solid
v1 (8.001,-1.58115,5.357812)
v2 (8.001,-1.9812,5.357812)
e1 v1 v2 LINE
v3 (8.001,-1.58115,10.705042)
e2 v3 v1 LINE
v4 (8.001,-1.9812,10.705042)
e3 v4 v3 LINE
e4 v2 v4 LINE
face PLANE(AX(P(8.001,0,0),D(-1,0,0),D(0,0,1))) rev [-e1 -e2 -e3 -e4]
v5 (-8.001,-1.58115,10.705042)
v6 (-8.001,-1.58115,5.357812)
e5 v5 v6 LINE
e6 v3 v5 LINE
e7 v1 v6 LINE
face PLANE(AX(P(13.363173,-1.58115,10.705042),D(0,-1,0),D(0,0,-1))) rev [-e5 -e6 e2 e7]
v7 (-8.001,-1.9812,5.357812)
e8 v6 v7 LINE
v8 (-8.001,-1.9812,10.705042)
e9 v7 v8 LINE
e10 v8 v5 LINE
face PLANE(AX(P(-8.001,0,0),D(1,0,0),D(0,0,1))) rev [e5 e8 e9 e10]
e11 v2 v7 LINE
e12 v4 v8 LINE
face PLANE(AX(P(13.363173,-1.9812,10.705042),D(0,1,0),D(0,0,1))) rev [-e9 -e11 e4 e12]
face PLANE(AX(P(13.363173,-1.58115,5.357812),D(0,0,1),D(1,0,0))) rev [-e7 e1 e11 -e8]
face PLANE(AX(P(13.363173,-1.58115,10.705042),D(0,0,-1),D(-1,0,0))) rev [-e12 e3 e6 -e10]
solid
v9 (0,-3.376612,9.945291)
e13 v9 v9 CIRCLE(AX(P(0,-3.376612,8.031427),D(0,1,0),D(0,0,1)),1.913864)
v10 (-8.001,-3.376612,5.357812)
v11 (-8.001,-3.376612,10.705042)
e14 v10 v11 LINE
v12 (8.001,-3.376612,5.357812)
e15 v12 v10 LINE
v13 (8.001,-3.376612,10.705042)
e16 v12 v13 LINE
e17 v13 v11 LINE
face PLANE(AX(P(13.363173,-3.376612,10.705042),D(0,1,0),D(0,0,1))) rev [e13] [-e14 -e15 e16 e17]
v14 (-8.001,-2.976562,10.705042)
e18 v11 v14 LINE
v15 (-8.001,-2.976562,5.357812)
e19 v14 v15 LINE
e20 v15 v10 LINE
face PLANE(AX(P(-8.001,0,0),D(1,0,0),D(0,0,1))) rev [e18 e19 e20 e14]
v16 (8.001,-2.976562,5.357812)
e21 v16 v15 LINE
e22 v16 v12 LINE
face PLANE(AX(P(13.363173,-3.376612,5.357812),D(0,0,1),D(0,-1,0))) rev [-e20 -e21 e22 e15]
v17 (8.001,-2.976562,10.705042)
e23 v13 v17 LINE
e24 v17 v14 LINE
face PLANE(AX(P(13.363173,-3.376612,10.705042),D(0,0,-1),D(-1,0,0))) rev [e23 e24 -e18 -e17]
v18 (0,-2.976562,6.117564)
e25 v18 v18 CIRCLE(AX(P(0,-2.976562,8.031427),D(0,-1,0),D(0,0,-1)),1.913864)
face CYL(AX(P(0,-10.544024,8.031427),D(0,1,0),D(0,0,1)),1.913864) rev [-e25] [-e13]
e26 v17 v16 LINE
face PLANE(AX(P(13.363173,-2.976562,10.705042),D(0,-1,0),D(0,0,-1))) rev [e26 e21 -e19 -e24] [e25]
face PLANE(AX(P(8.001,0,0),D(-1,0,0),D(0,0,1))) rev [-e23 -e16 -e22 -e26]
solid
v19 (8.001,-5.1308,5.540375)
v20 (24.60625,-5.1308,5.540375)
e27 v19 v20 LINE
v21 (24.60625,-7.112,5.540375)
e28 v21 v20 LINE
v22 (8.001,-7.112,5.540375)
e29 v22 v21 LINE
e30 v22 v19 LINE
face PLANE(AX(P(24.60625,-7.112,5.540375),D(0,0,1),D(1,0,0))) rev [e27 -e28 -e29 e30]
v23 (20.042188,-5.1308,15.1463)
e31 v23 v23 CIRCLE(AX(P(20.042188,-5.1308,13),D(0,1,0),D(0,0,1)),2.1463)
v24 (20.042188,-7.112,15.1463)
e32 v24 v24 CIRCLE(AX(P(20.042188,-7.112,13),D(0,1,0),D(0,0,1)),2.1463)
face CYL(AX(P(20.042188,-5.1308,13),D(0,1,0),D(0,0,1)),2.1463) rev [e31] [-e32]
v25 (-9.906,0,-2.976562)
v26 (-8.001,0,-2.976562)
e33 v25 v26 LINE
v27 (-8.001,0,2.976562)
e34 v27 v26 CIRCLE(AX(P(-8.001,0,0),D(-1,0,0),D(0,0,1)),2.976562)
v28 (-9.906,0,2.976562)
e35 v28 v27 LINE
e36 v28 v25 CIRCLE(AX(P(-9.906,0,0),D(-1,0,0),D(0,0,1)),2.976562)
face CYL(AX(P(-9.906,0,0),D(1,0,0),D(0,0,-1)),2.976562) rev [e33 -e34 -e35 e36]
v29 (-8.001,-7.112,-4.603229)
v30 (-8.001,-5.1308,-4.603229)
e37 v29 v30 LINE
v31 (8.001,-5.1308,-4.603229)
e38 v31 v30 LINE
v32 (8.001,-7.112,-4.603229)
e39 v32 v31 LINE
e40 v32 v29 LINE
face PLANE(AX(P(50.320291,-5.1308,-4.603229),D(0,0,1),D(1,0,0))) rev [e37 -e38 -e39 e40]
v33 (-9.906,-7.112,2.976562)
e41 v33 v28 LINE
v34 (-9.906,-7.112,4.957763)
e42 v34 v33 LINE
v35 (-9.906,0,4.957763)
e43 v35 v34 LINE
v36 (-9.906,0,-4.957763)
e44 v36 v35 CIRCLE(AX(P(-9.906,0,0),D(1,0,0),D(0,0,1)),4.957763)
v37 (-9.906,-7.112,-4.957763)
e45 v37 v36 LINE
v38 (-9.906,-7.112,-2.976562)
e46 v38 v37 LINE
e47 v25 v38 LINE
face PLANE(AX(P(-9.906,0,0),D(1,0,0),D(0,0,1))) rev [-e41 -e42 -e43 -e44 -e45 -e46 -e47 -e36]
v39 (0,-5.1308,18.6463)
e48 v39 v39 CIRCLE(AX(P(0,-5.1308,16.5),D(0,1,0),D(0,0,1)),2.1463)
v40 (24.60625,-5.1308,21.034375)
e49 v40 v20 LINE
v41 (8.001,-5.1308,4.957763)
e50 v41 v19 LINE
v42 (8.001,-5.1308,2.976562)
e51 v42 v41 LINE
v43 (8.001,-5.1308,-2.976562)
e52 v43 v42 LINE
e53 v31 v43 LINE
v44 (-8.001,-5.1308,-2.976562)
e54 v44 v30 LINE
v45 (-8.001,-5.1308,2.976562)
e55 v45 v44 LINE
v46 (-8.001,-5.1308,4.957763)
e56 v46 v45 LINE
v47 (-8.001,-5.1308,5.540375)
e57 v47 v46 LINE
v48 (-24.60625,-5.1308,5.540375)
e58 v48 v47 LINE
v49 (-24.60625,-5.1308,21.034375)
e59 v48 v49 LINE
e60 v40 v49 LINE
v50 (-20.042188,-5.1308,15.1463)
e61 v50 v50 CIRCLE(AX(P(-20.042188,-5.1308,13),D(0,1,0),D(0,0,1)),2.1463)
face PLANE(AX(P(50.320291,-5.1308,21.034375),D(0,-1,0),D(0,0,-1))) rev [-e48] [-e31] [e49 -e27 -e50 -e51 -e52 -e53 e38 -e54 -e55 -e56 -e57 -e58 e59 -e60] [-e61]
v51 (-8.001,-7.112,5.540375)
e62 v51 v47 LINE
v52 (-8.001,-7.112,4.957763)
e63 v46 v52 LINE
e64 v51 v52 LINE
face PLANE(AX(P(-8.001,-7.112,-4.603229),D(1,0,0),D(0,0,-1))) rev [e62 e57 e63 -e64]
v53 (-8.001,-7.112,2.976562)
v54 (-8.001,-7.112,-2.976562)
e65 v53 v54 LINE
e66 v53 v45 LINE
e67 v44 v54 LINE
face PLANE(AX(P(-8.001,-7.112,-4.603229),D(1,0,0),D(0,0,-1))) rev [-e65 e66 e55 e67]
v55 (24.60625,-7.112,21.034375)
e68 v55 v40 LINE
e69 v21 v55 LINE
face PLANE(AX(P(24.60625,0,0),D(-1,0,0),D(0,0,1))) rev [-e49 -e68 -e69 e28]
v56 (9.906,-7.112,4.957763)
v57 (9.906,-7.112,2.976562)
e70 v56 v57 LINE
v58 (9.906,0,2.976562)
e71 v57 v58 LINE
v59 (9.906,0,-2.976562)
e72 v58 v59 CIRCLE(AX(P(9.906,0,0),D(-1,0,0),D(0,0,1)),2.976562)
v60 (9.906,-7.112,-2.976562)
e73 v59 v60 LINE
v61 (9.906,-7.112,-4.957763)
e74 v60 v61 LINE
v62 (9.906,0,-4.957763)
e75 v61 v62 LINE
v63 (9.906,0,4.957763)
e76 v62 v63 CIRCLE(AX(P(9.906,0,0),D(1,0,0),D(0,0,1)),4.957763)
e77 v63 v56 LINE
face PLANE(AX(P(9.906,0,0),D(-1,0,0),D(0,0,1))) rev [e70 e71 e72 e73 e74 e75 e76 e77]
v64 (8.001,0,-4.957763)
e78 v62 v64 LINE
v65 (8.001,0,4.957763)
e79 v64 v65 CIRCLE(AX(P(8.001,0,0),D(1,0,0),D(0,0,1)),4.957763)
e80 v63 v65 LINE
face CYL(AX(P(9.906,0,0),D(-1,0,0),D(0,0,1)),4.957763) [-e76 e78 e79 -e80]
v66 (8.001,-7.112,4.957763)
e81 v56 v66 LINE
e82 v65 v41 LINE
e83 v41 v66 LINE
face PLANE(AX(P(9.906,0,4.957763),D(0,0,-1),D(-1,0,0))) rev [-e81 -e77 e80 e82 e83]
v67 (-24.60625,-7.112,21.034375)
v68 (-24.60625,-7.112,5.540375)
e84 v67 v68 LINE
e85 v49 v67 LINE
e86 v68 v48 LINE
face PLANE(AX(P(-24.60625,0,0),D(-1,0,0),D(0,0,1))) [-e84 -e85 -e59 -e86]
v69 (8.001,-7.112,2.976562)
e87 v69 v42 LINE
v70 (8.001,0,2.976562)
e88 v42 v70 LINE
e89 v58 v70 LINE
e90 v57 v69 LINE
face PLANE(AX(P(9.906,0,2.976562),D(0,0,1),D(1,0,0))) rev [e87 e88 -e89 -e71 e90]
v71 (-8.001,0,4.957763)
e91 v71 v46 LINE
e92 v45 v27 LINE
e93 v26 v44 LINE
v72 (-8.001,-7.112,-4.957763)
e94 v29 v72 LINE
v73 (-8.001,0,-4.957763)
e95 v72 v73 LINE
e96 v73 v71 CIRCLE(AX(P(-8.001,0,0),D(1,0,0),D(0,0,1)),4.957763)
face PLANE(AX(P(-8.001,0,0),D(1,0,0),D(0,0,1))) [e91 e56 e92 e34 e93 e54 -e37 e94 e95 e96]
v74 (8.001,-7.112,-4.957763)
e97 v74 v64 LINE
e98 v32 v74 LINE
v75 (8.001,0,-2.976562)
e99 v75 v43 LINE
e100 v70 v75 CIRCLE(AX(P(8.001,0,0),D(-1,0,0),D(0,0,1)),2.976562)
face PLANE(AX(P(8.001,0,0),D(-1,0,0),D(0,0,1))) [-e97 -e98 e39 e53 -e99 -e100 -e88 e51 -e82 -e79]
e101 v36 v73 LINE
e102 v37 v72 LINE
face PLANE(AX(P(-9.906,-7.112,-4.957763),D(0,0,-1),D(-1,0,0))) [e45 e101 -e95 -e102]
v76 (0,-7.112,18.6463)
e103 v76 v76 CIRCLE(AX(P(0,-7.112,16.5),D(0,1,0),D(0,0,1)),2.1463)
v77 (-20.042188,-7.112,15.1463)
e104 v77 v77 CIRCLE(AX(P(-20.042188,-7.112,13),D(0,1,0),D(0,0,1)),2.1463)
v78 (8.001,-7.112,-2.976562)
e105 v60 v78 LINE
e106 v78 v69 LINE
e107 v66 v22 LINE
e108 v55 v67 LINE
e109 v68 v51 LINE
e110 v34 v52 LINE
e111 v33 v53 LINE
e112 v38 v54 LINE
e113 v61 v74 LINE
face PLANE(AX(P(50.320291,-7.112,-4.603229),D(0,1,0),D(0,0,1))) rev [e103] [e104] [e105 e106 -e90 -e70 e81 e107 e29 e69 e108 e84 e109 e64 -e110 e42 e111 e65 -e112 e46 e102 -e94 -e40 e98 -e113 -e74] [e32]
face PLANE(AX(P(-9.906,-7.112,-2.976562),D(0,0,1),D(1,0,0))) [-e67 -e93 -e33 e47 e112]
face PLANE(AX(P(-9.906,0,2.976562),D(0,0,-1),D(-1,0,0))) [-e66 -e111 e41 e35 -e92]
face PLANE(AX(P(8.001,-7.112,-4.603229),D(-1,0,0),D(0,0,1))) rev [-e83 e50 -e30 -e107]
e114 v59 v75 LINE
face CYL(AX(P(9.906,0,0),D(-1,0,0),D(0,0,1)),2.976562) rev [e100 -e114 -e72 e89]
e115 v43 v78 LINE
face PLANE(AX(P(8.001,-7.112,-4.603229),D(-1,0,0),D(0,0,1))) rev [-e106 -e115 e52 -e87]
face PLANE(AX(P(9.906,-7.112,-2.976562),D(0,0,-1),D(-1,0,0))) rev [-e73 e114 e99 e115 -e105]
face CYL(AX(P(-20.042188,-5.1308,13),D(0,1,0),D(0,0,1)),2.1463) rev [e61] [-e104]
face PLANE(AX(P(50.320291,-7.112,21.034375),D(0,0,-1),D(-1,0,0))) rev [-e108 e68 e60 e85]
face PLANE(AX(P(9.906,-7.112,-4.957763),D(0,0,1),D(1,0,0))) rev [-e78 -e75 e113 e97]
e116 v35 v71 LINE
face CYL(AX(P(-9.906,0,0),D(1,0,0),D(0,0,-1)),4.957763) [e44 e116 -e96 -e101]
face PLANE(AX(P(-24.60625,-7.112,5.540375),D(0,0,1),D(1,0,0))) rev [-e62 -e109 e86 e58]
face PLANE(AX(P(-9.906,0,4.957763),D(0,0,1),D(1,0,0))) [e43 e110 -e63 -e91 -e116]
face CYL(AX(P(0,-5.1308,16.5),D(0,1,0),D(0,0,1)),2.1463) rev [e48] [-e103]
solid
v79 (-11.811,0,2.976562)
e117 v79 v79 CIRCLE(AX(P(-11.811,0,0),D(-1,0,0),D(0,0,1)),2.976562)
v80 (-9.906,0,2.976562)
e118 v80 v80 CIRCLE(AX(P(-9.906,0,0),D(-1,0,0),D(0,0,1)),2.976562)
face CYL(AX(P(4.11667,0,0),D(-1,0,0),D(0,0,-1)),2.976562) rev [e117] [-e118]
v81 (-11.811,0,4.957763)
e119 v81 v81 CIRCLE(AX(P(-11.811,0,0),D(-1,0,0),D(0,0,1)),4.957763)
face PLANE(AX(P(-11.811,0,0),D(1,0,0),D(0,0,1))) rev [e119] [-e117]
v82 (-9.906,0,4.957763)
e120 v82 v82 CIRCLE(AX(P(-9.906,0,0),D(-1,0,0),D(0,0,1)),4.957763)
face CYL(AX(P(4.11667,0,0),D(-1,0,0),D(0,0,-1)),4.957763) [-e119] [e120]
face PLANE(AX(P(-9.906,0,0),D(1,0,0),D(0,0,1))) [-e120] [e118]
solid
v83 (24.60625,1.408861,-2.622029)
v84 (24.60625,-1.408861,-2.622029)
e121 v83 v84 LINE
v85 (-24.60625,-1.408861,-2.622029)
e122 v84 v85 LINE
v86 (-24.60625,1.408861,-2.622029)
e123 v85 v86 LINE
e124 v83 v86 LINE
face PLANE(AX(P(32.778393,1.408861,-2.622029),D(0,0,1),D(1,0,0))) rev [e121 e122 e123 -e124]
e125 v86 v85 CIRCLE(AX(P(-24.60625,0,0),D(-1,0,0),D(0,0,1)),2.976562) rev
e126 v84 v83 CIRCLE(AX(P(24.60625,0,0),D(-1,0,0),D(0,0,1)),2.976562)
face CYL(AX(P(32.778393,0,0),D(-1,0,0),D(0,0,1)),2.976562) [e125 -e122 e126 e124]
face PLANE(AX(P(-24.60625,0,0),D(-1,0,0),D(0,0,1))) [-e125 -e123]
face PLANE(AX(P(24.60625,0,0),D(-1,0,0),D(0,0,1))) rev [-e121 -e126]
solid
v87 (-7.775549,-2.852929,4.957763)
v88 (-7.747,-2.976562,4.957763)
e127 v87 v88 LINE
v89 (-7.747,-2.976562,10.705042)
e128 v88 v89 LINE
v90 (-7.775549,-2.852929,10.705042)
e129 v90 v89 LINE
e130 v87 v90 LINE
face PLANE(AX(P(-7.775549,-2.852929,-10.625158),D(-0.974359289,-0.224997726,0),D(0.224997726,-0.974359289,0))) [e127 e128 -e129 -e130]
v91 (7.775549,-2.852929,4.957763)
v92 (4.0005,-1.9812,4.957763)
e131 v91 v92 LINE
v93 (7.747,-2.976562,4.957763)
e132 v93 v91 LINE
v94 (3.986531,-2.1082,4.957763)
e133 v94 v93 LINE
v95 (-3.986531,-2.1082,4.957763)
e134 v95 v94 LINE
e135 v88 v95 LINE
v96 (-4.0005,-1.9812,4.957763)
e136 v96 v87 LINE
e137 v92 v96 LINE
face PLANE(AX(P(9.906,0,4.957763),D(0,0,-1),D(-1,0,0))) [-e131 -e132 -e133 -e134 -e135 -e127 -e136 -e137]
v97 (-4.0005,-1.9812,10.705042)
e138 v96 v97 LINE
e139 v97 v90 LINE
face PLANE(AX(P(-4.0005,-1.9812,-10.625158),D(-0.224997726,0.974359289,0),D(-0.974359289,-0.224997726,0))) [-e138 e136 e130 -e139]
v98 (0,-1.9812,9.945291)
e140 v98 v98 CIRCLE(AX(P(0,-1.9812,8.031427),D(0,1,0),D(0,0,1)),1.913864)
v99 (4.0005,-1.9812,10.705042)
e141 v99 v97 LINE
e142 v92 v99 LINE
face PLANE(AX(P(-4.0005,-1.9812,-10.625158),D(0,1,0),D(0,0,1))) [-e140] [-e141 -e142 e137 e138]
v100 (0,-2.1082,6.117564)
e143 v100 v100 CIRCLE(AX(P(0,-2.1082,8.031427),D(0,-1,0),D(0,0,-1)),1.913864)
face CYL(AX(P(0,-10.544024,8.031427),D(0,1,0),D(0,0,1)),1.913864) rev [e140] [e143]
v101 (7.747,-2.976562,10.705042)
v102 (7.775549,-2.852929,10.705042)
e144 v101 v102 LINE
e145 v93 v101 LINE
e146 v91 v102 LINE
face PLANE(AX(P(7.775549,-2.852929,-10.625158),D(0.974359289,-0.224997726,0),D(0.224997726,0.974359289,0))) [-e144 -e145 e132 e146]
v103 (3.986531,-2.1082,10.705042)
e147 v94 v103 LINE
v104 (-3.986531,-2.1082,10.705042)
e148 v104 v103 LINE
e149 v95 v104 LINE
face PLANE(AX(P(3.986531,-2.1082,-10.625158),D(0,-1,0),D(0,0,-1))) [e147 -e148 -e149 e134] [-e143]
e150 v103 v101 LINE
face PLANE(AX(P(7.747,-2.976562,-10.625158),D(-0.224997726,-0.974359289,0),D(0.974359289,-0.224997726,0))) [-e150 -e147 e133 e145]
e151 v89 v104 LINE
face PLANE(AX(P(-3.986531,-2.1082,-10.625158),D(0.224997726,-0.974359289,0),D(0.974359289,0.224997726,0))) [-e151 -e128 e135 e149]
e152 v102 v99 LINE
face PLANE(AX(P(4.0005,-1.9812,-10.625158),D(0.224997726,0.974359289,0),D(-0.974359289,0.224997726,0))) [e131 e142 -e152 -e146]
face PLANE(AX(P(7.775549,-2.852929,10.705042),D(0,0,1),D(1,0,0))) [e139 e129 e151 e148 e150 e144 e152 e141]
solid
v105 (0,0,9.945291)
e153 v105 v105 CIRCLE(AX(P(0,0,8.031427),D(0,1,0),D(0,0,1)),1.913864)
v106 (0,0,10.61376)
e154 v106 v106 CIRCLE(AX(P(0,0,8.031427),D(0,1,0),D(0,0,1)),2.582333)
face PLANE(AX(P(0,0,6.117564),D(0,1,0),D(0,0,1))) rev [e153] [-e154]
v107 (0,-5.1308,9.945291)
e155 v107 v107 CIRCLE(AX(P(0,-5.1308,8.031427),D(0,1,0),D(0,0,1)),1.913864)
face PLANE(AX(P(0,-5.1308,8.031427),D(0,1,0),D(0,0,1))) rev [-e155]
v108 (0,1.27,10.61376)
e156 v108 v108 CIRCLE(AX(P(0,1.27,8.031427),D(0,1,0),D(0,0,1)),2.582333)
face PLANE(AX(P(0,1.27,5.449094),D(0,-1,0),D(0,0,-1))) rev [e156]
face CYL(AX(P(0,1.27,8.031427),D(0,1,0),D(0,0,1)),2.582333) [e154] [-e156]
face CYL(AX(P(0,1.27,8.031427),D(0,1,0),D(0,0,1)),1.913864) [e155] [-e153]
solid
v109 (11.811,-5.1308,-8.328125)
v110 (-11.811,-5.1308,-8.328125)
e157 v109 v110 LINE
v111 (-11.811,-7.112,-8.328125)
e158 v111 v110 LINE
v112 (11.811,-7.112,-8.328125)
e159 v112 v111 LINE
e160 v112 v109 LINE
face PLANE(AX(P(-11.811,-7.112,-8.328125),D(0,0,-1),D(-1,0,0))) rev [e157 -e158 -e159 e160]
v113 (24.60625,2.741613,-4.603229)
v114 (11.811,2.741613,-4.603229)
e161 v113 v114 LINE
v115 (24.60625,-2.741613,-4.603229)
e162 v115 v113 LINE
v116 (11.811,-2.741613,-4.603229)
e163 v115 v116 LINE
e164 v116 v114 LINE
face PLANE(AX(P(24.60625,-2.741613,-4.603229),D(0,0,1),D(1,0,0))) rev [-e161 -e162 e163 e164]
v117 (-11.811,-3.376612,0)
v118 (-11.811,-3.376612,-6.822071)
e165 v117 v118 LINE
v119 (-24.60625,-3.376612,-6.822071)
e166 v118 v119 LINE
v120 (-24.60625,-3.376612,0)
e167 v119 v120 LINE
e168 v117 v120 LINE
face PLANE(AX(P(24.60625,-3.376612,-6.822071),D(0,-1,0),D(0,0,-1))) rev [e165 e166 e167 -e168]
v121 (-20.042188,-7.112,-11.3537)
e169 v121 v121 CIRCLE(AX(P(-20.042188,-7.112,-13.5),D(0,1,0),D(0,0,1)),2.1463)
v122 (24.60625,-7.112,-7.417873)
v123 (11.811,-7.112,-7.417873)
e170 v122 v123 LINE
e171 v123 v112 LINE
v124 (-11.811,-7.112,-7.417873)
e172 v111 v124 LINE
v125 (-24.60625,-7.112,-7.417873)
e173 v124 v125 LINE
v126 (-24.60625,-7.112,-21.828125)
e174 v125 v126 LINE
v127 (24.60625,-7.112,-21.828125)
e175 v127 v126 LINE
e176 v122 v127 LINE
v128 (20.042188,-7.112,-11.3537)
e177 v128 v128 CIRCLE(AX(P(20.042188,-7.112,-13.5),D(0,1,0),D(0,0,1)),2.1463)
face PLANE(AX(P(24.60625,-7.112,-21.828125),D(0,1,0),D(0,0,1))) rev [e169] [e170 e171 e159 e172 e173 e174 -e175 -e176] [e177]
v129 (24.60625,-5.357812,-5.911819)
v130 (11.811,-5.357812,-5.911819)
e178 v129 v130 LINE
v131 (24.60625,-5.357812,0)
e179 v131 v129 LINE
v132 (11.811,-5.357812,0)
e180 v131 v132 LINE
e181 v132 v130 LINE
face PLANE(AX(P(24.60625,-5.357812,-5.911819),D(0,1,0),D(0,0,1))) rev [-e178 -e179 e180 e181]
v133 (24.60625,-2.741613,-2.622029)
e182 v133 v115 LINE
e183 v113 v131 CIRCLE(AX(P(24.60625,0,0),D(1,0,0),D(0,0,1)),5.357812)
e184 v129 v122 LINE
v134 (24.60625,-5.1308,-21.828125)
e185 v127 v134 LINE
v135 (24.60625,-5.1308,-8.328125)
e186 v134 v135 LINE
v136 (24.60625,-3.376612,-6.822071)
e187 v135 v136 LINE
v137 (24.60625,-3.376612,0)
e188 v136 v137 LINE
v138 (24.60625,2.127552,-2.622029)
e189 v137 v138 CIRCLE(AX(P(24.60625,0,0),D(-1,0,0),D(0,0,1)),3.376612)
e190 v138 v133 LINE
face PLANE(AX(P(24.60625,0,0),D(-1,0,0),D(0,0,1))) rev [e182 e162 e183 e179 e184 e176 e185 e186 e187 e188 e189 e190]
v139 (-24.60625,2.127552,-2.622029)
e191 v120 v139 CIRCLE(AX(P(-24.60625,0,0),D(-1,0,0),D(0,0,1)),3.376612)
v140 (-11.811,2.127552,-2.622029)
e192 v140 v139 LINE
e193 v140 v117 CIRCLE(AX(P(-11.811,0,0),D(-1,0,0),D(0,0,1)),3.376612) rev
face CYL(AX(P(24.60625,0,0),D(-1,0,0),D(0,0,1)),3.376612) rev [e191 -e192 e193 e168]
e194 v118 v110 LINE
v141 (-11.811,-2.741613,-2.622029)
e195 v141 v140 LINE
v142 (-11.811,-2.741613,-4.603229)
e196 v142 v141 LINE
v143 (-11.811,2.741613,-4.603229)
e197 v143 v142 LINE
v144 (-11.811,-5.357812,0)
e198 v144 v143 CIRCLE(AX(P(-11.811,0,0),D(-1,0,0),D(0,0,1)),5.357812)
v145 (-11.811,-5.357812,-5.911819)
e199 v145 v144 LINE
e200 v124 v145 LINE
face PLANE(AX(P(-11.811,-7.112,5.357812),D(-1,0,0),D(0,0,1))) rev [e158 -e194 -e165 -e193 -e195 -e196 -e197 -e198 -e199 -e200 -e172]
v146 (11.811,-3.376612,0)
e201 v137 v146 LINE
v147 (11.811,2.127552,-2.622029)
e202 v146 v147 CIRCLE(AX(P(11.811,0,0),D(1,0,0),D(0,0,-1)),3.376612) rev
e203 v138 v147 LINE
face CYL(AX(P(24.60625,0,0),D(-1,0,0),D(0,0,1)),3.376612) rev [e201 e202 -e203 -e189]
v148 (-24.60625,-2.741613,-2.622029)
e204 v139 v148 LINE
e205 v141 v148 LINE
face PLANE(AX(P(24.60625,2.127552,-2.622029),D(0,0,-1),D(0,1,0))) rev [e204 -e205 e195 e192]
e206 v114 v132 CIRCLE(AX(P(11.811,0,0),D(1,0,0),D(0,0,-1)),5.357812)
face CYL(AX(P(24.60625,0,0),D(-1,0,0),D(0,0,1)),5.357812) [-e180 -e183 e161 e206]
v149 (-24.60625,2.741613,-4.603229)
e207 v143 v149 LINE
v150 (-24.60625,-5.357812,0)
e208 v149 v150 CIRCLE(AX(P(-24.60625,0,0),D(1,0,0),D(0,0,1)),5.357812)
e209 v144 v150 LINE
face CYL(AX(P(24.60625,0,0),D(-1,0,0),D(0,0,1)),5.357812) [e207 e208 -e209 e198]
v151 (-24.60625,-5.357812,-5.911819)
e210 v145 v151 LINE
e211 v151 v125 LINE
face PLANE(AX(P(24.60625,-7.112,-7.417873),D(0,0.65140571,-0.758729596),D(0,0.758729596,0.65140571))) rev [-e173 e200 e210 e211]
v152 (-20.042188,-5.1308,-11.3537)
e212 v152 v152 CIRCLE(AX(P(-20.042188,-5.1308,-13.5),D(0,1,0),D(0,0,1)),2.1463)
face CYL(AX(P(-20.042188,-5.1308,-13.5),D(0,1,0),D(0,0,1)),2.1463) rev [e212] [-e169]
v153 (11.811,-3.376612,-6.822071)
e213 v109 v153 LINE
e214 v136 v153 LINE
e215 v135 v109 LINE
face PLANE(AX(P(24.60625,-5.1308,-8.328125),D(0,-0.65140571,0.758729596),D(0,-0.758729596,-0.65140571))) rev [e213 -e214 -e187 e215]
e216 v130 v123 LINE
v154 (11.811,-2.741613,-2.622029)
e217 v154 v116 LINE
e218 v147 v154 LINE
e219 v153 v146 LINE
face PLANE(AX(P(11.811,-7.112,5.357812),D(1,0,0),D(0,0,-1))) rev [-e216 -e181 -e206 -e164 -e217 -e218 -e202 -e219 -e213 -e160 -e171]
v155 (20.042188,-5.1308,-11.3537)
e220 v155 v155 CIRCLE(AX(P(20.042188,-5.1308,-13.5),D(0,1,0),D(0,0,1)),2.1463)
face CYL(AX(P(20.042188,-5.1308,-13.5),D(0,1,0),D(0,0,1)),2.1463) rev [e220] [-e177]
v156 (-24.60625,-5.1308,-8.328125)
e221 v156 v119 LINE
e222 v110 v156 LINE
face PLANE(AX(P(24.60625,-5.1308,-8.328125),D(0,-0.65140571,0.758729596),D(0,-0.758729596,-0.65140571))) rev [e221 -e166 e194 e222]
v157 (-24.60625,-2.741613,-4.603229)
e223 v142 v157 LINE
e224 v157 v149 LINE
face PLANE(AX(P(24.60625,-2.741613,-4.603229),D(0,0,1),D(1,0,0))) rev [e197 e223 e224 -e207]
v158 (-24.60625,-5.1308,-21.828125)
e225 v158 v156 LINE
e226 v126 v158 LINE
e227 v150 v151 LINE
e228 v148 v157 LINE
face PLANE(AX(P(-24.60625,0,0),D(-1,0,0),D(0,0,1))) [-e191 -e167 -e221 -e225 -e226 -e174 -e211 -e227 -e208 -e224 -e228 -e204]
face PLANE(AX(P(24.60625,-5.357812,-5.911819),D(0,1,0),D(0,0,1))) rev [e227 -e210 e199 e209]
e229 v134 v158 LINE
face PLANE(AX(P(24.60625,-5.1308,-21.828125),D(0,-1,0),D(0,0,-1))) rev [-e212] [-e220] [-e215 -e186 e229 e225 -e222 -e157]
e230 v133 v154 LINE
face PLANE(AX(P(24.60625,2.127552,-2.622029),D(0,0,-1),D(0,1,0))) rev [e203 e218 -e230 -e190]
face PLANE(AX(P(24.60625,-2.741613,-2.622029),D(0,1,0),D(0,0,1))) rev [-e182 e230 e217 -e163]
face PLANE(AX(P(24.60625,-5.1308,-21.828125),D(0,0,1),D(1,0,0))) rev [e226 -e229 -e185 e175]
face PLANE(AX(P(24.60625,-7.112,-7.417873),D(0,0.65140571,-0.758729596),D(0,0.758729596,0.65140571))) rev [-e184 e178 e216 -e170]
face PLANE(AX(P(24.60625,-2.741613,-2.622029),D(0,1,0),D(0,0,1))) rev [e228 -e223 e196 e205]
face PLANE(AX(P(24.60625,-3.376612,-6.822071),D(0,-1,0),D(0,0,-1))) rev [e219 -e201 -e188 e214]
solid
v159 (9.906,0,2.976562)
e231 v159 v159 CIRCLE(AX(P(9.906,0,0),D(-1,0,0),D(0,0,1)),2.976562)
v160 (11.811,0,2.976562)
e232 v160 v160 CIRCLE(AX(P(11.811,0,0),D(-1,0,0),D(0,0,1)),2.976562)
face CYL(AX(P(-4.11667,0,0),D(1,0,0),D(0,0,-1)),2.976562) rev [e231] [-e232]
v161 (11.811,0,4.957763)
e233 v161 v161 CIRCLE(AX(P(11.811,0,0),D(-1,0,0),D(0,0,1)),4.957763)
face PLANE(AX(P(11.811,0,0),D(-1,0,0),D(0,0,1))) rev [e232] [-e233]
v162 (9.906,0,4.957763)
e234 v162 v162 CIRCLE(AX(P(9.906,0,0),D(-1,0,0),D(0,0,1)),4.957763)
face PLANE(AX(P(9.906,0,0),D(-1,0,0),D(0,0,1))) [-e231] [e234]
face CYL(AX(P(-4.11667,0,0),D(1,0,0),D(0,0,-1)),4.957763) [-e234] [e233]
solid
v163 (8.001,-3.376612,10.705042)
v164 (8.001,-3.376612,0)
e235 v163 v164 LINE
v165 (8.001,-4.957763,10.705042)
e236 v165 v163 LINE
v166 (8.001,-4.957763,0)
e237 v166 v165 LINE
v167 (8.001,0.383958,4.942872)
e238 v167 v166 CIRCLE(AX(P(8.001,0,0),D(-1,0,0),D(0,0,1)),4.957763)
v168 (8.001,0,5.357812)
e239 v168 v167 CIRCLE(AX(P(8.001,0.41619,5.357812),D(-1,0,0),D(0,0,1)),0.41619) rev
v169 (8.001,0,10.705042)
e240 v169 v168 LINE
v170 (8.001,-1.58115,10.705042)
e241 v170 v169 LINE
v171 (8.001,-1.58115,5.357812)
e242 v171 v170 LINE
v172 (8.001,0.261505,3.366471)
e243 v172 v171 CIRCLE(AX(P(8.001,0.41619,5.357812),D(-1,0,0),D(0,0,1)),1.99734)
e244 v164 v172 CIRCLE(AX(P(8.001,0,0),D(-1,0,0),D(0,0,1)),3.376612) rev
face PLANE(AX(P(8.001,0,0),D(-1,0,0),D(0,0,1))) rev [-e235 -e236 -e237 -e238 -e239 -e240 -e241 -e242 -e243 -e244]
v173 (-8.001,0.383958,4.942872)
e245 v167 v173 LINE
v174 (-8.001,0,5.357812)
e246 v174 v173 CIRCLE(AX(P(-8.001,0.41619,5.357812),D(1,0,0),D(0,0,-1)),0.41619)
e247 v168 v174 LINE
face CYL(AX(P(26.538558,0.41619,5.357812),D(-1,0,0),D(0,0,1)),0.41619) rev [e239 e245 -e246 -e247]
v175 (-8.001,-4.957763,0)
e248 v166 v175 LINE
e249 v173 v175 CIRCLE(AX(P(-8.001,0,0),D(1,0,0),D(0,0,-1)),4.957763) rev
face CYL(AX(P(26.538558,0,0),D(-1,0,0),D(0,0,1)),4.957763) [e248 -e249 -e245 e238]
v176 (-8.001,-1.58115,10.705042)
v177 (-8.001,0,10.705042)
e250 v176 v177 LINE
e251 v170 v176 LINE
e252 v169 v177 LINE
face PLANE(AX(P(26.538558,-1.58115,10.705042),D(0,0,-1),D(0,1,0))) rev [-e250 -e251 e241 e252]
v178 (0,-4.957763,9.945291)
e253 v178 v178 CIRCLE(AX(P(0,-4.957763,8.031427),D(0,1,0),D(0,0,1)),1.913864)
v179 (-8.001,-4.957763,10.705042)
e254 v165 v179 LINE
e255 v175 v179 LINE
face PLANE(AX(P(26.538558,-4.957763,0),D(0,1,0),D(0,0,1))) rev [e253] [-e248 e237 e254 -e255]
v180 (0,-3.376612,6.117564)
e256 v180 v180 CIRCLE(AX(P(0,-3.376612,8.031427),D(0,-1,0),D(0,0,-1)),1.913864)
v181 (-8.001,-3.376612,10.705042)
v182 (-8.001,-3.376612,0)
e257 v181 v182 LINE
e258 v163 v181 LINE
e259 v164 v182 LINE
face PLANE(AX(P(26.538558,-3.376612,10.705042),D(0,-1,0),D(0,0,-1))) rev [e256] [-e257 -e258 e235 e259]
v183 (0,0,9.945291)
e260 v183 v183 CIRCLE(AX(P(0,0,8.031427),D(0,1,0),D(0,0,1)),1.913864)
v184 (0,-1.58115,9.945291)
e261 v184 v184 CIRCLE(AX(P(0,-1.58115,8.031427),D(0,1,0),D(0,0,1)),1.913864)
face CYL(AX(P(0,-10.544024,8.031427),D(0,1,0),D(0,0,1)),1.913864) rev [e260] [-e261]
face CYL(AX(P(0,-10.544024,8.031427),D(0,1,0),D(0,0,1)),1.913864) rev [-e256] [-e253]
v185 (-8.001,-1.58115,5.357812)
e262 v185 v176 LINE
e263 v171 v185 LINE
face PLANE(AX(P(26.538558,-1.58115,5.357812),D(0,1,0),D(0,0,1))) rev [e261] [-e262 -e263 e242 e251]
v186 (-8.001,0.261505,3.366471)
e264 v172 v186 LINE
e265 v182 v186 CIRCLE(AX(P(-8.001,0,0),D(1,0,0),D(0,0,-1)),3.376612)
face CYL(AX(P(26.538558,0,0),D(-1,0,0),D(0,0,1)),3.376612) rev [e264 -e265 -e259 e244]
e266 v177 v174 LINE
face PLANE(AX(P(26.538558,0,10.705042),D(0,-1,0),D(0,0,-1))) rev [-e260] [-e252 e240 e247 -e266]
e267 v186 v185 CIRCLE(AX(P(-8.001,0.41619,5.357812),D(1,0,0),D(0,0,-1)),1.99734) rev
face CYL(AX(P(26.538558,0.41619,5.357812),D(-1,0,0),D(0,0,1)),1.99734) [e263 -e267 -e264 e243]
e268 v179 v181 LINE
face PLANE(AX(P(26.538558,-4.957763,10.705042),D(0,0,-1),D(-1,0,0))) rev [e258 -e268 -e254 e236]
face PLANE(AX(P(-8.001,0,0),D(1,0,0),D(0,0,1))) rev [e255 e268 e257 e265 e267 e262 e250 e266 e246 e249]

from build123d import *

# Parameters (mm, degrees)
EXTRUDE1_DEPTH                      = 24.60625
CUT_EXTRUDE1_DEPTH                  = 34.652862049
CUT_EXTRUDE1_DEPTH_BACK             = 34.652862049
SKETCH2_W                           = 23.622
SKETCH2_H                           = 13.6859375
EXTRUDE2_START                      = -24.60625
EXTRUDE2_DEPTH                      = 49.2125
SKETCH16_W                          = 16.60525
SKETCH16_H                          = 10.143603833
CUT_EXTRUDE4_DEPTH                  = 35.524564766
EXTRUDE7_DEPTH                      = 1.905
SKETCH18_R                          = 4.9577625
SKETCH18_R_2                        = 2.9765625
EXTRUDE8_DEPTH                      = 1.905
EXTRUDE9_START                      = -8.001
EXTRUDE9_DEPTH                      = 16.002
EXTRUDE10_START                     = -8.001
SKETCH21_W                          = 5.347229167
SKETCH21_H                          = 0.40005
EXTRUDE10_DEPTH                     = 16.002
EXTRUDE12_REACH                     = 35.653
SKETCH24_W                          = 5.347229167
SKETCH24_H                          = 0.40005
EXTRUDE12_DIRECTION_2_REACH         = 35.653
EXTRUDE11_DEPTH                     = 5.747279167
EXTRUDE5_START                      = -24.60625
EXTRUDE5_DEPTH                      = 49.2125
SKETCH11_W                          = 2.1463
SKETCH11_H                          = 1.9812
F_8_0_199_DIAMETER_HOLE3_AT_2_COUNT = 2
F_8_0_199_DIAMETER_HOLE3_AT_2_PITCH = 40.084375
F_8_0_199_DIAMETER_HOLE3_AT_3_COUNT = 2
F_8_0_199_DIAMETER_HOLE3_AT_3_PITCH = 26.5
F_8_0_199_DIAMETER_HOLE3_AT_4_COUNT = 2
F_8_0_199_DIAMETER_HOLE3_AT_4_PITCH = 48.052129184
F_8_0_199_DIAMETER_HOLE3_AT_5_COUNT = 2
F_8_0_199_DIAMETER_HOLE3_AT_5_PITCH = 36.078931245
CUT_EXTRUDE3_START                  = -4.957763
SKETCH14_R                          = 1.913863542
CUT_EXTRUDE3_DEPTH                  = 4.957763


# Read off the part's stored shape, not the designer's step: Extrude9
with BuildPart() as part:
    # Sketch1 → Extrude1 (new, symmetric)
    with BuildSketch(Plane(origin=(0, 0, 0), x_dir=(0, 0, -1), z_dir=(1, 0, 0))):
        with BuildLine():
            Line((21.828125, -5.1308), (8.328125, -5.1308))
            Line((8.328125, -5.1308), (6.822070985, -3.3766125))
            Line((6.822070985, -3.3766125), (0, -3.3766125))
            ThreePointArc((0, -3.3766125), (-3.048395485, 1.452169736), (2.622028833, 2.127551827))
            Line((2.622028833, 2.127551827), (2.622028833, -2.7416125))
            Line((2.622028833, -2.7416125), (4.603228833, -2.7416125))
            Line((4.603228833, -2.7416125), (4.603228833, 2.7416125))
            ThreePointArc((4.603228833, 2.7416125), (-4.658068296, 2.647367472), (0, -5.3578125))
            Line((0, -5.3578125), (5.911819151, -5.3578125))
            Line((5.911819151, -5.3578125), (7.417873166, -7.112))
            Line((7.417873166, -7.112), (21.828125, -7.112))
            Line((21.828125, -7.112), (21.828125, -5.1308))
        make_face()
    extrude(amount=EXTRUDE1_DEPTH, both=True)

    # Sketch2 → Cut-Extrude1 (cut, two sides: drawn at the far end of the back side and taken through both)
    with BuildSketch(Plane(origin=(0, 0, 0), x_dir=(1, 0, 0), z_dir=(0, 1, 0)).offset(-CUT_EXTRUDE1_DEPTH_BACK)):
        with Locations((0, 1.48515625)):
            Rectangle(SKETCH2_W, SKETCH2_H)
    extrude(amount=CUT_EXTRUDE1_DEPTH + CUT_EXTRUDE1_DEPTH_BACK, mode=Mode.SUBTRACT)

    # Sketch11 → #8 (0.199) Diameter Hole3 (revolve, cut)
    with BuildSketch(Plane(origin=(-20.0421875, -5.1308, -13.5), x_dir=(0, 0, 1), z_dir=(1, 0, 0))):
        with Locations((1.07315, 0.9906)):
            Rectangle(SKETCH11_W, SKETCH11_H)
    f_8_0_199_diameter_hole3 = revolve(axis=Axis((-20.0421875, 1.2192, -13.5), (0, -1, 0)), mode=Mode.SUBTRACT)

    # #8 (0.199) Diameter Hole3 at 2: #8 (0.199) Diameter Hole3 ×2
    with Locations(*[(i * F_8_0_199_DIAMETER_HOLE3_AT_2_PITCH, 0, 0) for i in range(1, F_8_0_199_DIAMETER_HOLE3_AT_2_COUNT)]):
        add(f_8_0_199_diameter_hole3, mode=Mode.SUBTRACT)


with BuildPart() as body_2:
    # Sketch3 → Extrude2 (new body)
    with BuildSketch(Plane(origin=(0, 0, 0), x_dir=(0, 0, -1), z_dir=(1, 0, 0)).offset(EXTRUDE2_START)):
        Polygon((-21.034375, -7.112), (-5.540375, -7.112), (4.603228833, -7.112), (4.603228833, -5.1308), (-5.540375, -5.1308), (-21.034375, -5.1308), align=None)
    extrude(amount=EXTRUDE2_DEPTH)

    # Sketch16 → Cut-Extrude4 (cut, through all)
    with BuildSketch(Plane(origin=(0, -5.1308, 0), x_dir=(-1, 0, 0), z_dir=(0, 1, 0))):
        with Locations((-16.303625, 0.468573083)):
            Rectangle(SKETCH16_W, SKETCH16_H)
        with Locations((16.303625, 0.468573083)):
            Rectangle(SKETCH16_W, SKETCH16_H)
    extrude(amount=-CUT_EXTRUDE4_DEPTH, mode=Mode.SUBTRACT)

    # Sketch17 → Extrude7 (add)
    with BuildSketch(Plane(origin=(8.001, 0, 0), x_dir=(0, 0, -1), z_dir=(1, 0, 0))):
        with BuildLine():
            Line((2.9765625, -7.112), (2.9765625, 0))
            ThreePointArc((2.9765625, 0), (0, 2.9765625), (-2.9765625, 0))
            Line((-2.9765625, 0), (-2.9765625, -7.112))
            Line((-2.9765625, -7.112), (-4.9577625, -7.112))
            Line((-4.9577625, -7.112), (-4.9577625, 0))
            ThreePointArc((-4.9577625, 0), (0, 4.9577625), (4.9577625, 0))
            Line((4.9577625, 0), (4.9577625, -7.112))
            Line((4.9577625, -7.112), (2.9765625, -7.112))
        make_face()
    extrude7 = extrude(amount=EXTRUDE7_DEPTH)

    # Mirror3: Extrude7 across plane
    add(extrude7.mirror(Plane(origin=(0, 0, 0), x_dir=(0, 0, 1), z_dir=(1, 0, 0))))

    # #8 (0.199) Diameter Hole3 at 3: #8 (0.199) Diameter Hole3 ×2
    with Locations(*[(0, 0, i * F_8_0_199_DIAMETER_HOLE3_AT_3_PITCH) for i in range(1, F_8_0_199_DIAMETER_HOLE3_AT_3_COUNT)]):
        add(f_8_0_199_diameter_hole3, mode=Mode.SUBTRACT)

    # #8 (0.199) Diameter Hole3 at 4: #8 (0.199) Diameter Hole3 ×2
    with Locations(*[Vector(0.8341852001249447, 0, 0.5514844076603672) * (i * F_8_0_199_DIAMETER_HOLE3_AT_4_PITCH) for i in range(1, F_8_0_199_DIAMETER_HOLE3_AT_4_COUNT)]):
        add(f_8_0_199_diameter_hole3, mode=Mode.SUBTRACT)

    # #8 (0.199) Diameter Hole3 at 5: #8 (0.199) Diameter Hole3 ×2
    with Locations(*[Vector(0.5555094568592278, 0, 0.8315102184218579) * (i * F_8_0_199_DIAMETER_HOLE3_AT_5_PITCH) for i in range(1, F_8_0_199_DIAMETER_HOLE3_AT_5_COUNT)]):
        add(f_8_0_199_diameter_hole3, mode=Mode.SUBTRACT)


with BuildPart() as body_3:
    # Sketch18 → Extrude8 (new body)
    with BuildSketch(Plane.ZY.offset(-11.811)):
        Circle(SKETCH18_R)
        Circle(SKETCH18_R_2, mode=Mode.SUBTRACT)
    extrude(amount=EXTRUDE8_DEPTH)


with BuildPart() as body_4:
    # Mirror4: mirrored copy
    add(body_3.part.mirror(Plane(origin=(0, 0, 0), x_dir=(0, 0, 1), z_dir=(1, 0, 0))))


with BuildPart() as body_5:
    # Extrude9 outline → Extrude9 (new body)
    with BuildSketch(Plane(origin=(0, 0, 0), x_dir=(0, 0, -1), z_dir=(1, 0, 0)).offset(EXTRUDE9_START)):
        with BuildLine():
            Line((-10.705041667, -3.3766125), (-10.705041667, -4.9577625))
            Line((-10.705041667, -4.9577625), (0, -4.9577625))
            ThreePointArc((0, -4.9577625), (3.638885972, 3.367182486), (-4.942872157, 0.383958131))
            ThreePointArc((-4.942872157, 0.383958131), (-5.075146914, 0.110716009), (-5.3578125, 0))
            Line((-5.3578125, 0), (-10.705041667, 0))
            Line((-10.705041667, 0), (-10.705041667, -1.58115))
            Line((-10.705041667, -1.58115), (-5.3578125, -1.58115))
            ThreePointArc((-5.3578125, -1.58115), (-4.001271232, -1.049812466), (-3.366471046, 0.261504625))
            ThreePointArc((-3.366471046, 0.261504625), (2.478357497, 2.293306803), (0, -3.3766125))
            Line((0, -3.3766125), (-10.705041667, -3.3766125))
        make_face()
    extrude(amount=EXTRUDE9_DEPTH)


with BuildPart() as body_6:
    # Sketch21 → Extrude10 (new body)
    with BuildSketch(Plane(origin=(0, 0, 0), x_dir=(0, 0, -1), z_dir=(1, 0, 0)).offset(EXTRUDE10_START)):
        with Locations((-8.031427084, -3.1765875)):
            Rectangle(SKETCH21_W, SKETCH21_H)
    extrude(amount=EXTRUDE10_DEPTH)


with BuildPart() as body_7:

    # Extrude12: up to this face of the body (flat: up to its plane)
    extrude12_end = Plane(body_5.part.faces().sort_by_distance((8.001, -3.561988084, 5.352520833))[0])
    # Sketch24 → Extrude12 (new, up to the picked face)
    with BuildSketch(Plane(origin=(0, 0, 0), x_dir=(0, 0, -1), z_dir=(1, 0, 0)), mode=Mode.PRIVATE) as extrude12_sk1:
        with Locations((-8.031427084, -1.781175)):
            Rectangle(SKETCH24_W, SKETCH24_H)
    extrude12_tool1 = split(extrude(extrude12_sk1.sketch, amount=EXTRUDE12_REACH, mode=Mode.PRIVATE), bisect_by=extrude12_end, keep=Keep.BOTH, mode=Mode.PRIVATE)
    add(extrude12_tool1.solids().sort_by(Axis((0, -1.781175, 8.031427), (1, 0, 0)))[0])


    # Extrude12 direction 2: up to this face of the body (flat: up to its plane)
    extrude12_direction_2_end = Plane(body_5.part.faces().sort_by_distance((-8.001, -3.561988084, 5.352520833))[0])
    # Sketch24 → Extrude12 direction 2 (add, up to the picked face)
    with BuildSketch(Plane(origin=(0, 0, 0), x_dir=(0, 0, -1), z_dir=(1, 0, 0)), mode=Mode.PRIVATE) as extrude12_direction_2_sk1:
        with Locations((-8.031427084, -1.781175)):
            Rectangle(SKETCH24_W, SKETCH24_H)
    extrude12_direction_2_tool1 = split(extrude(extrude12_direction_2_sk1.sketch, amount=-EXTRUDE12_DIRECTION_2_REACH, mode=Mode.PRIVATE), bisect_by=extrude12_direction_2_end, keep=Keep.BOTH, mode=Mode.PRIVATE)
    add(extrude12_direction_2_tool1.solids().sort_by(Axis((0, -1.781175, 8.031427), (-1, 0, 0)))[0])


with BuildPart() as body_8:
    # Sketch22 → Extrude11 (new body)
    with BuildSketch(Plane.XY.offset(10.705041667)):
        Polygon((7.747, -2.9765625), (3.986530586, -2.1082), (-3.986530586, -2.1082), (-7.747, -2.9765625), (-7.775549223, -2.85292925), (-4.0005, -1.9812), (4.0005, -1.9812), (7.775549223, -2.85292925), align=None)
    extrude(amount=-EXTRUDE11_DEPTH)


with BuildPart() as body_9:
    # Sketch6 → Extrude5 (new body)
    with BuildSketch(Plane(origin=(0, 0, 0), x_dir=(0, 0, -1), z_dir=(1, 0, 0)).offset(EXTRUDE5_START)):
        with BuildLine():
            Line((2.622028833, 1.408860929), (2.622028833, -1.408860929))
            ThreePointArc((2.622028833, -1.408860929), (-2.9765625, 0), (2.622028833, 1.408860929))
        make_face()
    extrude(amount=EXTRUDE5_DEPTH)


with BuildPart() as cut_extrude3_tool:
    # Sketch14 → Cut-Extrude3 (new body)
    with BuildSketch(Plane(origin=(0, 0, 0), x_dir=(-1, 0, 0), z_dir=(0, 1, 0)).offset(CUT_EXTRUDE3_START)):
        with Locations(Location((0, 8.031427083, 0), (0, 0, 90))):
            Circle(SKETCH14_R)
    extrude(amount=CUT_EXTRUDE3_DEPTH)


with BuildPart() as body_5_1:
    add(body_5.part)

    # Cut-Extrude3: cut by cut_extrude3_tool
    add(cut_extrude3_tool.part, mode=Mode.SUBTRACT)


with BuildPart() as body_6_1:
    add(body_6.part)

    # Cut-Extrude3: cut by cut_extrude3_tool
    add(cut_extrude3_tool.part, mode=Mode.SUBTRACT)


with BuildPart() as body_8_1:
    add(body_8.part)

    # Cut-Extrude3: cut by cut_extrude3_tool
    add(cut_extrude3_tool.part, mode=Mode.SUBTRACT)


with BuildPart() as body_10:
    # Sketch23 → Revolve2 (revolve)
    with BuildSketch(Plane(origin=(0, 0, 0), x_dir=(0, 0, -1), z_dir=(1, 0, 0)), mode=Mode.PRIVATE) as revolve2_sk:
        Polygon((-8.031427083, 1.27), (-8.031427083, -5.1308), (-6.117563542, -5.1308), (-6.117563542, 0), (-5.44909375, 0), (-5.44909375, 1.27), align=None)
    revolve(revolve2_sk.sketch.rotate(Axis((0, 1.27, 8.031427083), (0, -1, 0)), 180), axis=Axis((0, 1.27, 8.031427083), (0, -1, 0)))


solid = Compound([part.part, body_2.part, body_3.part, body_4.part, body_7.part, body_9.part, body_5_1.part, body_6_1.part, body_8_1.part, body_10.part])
